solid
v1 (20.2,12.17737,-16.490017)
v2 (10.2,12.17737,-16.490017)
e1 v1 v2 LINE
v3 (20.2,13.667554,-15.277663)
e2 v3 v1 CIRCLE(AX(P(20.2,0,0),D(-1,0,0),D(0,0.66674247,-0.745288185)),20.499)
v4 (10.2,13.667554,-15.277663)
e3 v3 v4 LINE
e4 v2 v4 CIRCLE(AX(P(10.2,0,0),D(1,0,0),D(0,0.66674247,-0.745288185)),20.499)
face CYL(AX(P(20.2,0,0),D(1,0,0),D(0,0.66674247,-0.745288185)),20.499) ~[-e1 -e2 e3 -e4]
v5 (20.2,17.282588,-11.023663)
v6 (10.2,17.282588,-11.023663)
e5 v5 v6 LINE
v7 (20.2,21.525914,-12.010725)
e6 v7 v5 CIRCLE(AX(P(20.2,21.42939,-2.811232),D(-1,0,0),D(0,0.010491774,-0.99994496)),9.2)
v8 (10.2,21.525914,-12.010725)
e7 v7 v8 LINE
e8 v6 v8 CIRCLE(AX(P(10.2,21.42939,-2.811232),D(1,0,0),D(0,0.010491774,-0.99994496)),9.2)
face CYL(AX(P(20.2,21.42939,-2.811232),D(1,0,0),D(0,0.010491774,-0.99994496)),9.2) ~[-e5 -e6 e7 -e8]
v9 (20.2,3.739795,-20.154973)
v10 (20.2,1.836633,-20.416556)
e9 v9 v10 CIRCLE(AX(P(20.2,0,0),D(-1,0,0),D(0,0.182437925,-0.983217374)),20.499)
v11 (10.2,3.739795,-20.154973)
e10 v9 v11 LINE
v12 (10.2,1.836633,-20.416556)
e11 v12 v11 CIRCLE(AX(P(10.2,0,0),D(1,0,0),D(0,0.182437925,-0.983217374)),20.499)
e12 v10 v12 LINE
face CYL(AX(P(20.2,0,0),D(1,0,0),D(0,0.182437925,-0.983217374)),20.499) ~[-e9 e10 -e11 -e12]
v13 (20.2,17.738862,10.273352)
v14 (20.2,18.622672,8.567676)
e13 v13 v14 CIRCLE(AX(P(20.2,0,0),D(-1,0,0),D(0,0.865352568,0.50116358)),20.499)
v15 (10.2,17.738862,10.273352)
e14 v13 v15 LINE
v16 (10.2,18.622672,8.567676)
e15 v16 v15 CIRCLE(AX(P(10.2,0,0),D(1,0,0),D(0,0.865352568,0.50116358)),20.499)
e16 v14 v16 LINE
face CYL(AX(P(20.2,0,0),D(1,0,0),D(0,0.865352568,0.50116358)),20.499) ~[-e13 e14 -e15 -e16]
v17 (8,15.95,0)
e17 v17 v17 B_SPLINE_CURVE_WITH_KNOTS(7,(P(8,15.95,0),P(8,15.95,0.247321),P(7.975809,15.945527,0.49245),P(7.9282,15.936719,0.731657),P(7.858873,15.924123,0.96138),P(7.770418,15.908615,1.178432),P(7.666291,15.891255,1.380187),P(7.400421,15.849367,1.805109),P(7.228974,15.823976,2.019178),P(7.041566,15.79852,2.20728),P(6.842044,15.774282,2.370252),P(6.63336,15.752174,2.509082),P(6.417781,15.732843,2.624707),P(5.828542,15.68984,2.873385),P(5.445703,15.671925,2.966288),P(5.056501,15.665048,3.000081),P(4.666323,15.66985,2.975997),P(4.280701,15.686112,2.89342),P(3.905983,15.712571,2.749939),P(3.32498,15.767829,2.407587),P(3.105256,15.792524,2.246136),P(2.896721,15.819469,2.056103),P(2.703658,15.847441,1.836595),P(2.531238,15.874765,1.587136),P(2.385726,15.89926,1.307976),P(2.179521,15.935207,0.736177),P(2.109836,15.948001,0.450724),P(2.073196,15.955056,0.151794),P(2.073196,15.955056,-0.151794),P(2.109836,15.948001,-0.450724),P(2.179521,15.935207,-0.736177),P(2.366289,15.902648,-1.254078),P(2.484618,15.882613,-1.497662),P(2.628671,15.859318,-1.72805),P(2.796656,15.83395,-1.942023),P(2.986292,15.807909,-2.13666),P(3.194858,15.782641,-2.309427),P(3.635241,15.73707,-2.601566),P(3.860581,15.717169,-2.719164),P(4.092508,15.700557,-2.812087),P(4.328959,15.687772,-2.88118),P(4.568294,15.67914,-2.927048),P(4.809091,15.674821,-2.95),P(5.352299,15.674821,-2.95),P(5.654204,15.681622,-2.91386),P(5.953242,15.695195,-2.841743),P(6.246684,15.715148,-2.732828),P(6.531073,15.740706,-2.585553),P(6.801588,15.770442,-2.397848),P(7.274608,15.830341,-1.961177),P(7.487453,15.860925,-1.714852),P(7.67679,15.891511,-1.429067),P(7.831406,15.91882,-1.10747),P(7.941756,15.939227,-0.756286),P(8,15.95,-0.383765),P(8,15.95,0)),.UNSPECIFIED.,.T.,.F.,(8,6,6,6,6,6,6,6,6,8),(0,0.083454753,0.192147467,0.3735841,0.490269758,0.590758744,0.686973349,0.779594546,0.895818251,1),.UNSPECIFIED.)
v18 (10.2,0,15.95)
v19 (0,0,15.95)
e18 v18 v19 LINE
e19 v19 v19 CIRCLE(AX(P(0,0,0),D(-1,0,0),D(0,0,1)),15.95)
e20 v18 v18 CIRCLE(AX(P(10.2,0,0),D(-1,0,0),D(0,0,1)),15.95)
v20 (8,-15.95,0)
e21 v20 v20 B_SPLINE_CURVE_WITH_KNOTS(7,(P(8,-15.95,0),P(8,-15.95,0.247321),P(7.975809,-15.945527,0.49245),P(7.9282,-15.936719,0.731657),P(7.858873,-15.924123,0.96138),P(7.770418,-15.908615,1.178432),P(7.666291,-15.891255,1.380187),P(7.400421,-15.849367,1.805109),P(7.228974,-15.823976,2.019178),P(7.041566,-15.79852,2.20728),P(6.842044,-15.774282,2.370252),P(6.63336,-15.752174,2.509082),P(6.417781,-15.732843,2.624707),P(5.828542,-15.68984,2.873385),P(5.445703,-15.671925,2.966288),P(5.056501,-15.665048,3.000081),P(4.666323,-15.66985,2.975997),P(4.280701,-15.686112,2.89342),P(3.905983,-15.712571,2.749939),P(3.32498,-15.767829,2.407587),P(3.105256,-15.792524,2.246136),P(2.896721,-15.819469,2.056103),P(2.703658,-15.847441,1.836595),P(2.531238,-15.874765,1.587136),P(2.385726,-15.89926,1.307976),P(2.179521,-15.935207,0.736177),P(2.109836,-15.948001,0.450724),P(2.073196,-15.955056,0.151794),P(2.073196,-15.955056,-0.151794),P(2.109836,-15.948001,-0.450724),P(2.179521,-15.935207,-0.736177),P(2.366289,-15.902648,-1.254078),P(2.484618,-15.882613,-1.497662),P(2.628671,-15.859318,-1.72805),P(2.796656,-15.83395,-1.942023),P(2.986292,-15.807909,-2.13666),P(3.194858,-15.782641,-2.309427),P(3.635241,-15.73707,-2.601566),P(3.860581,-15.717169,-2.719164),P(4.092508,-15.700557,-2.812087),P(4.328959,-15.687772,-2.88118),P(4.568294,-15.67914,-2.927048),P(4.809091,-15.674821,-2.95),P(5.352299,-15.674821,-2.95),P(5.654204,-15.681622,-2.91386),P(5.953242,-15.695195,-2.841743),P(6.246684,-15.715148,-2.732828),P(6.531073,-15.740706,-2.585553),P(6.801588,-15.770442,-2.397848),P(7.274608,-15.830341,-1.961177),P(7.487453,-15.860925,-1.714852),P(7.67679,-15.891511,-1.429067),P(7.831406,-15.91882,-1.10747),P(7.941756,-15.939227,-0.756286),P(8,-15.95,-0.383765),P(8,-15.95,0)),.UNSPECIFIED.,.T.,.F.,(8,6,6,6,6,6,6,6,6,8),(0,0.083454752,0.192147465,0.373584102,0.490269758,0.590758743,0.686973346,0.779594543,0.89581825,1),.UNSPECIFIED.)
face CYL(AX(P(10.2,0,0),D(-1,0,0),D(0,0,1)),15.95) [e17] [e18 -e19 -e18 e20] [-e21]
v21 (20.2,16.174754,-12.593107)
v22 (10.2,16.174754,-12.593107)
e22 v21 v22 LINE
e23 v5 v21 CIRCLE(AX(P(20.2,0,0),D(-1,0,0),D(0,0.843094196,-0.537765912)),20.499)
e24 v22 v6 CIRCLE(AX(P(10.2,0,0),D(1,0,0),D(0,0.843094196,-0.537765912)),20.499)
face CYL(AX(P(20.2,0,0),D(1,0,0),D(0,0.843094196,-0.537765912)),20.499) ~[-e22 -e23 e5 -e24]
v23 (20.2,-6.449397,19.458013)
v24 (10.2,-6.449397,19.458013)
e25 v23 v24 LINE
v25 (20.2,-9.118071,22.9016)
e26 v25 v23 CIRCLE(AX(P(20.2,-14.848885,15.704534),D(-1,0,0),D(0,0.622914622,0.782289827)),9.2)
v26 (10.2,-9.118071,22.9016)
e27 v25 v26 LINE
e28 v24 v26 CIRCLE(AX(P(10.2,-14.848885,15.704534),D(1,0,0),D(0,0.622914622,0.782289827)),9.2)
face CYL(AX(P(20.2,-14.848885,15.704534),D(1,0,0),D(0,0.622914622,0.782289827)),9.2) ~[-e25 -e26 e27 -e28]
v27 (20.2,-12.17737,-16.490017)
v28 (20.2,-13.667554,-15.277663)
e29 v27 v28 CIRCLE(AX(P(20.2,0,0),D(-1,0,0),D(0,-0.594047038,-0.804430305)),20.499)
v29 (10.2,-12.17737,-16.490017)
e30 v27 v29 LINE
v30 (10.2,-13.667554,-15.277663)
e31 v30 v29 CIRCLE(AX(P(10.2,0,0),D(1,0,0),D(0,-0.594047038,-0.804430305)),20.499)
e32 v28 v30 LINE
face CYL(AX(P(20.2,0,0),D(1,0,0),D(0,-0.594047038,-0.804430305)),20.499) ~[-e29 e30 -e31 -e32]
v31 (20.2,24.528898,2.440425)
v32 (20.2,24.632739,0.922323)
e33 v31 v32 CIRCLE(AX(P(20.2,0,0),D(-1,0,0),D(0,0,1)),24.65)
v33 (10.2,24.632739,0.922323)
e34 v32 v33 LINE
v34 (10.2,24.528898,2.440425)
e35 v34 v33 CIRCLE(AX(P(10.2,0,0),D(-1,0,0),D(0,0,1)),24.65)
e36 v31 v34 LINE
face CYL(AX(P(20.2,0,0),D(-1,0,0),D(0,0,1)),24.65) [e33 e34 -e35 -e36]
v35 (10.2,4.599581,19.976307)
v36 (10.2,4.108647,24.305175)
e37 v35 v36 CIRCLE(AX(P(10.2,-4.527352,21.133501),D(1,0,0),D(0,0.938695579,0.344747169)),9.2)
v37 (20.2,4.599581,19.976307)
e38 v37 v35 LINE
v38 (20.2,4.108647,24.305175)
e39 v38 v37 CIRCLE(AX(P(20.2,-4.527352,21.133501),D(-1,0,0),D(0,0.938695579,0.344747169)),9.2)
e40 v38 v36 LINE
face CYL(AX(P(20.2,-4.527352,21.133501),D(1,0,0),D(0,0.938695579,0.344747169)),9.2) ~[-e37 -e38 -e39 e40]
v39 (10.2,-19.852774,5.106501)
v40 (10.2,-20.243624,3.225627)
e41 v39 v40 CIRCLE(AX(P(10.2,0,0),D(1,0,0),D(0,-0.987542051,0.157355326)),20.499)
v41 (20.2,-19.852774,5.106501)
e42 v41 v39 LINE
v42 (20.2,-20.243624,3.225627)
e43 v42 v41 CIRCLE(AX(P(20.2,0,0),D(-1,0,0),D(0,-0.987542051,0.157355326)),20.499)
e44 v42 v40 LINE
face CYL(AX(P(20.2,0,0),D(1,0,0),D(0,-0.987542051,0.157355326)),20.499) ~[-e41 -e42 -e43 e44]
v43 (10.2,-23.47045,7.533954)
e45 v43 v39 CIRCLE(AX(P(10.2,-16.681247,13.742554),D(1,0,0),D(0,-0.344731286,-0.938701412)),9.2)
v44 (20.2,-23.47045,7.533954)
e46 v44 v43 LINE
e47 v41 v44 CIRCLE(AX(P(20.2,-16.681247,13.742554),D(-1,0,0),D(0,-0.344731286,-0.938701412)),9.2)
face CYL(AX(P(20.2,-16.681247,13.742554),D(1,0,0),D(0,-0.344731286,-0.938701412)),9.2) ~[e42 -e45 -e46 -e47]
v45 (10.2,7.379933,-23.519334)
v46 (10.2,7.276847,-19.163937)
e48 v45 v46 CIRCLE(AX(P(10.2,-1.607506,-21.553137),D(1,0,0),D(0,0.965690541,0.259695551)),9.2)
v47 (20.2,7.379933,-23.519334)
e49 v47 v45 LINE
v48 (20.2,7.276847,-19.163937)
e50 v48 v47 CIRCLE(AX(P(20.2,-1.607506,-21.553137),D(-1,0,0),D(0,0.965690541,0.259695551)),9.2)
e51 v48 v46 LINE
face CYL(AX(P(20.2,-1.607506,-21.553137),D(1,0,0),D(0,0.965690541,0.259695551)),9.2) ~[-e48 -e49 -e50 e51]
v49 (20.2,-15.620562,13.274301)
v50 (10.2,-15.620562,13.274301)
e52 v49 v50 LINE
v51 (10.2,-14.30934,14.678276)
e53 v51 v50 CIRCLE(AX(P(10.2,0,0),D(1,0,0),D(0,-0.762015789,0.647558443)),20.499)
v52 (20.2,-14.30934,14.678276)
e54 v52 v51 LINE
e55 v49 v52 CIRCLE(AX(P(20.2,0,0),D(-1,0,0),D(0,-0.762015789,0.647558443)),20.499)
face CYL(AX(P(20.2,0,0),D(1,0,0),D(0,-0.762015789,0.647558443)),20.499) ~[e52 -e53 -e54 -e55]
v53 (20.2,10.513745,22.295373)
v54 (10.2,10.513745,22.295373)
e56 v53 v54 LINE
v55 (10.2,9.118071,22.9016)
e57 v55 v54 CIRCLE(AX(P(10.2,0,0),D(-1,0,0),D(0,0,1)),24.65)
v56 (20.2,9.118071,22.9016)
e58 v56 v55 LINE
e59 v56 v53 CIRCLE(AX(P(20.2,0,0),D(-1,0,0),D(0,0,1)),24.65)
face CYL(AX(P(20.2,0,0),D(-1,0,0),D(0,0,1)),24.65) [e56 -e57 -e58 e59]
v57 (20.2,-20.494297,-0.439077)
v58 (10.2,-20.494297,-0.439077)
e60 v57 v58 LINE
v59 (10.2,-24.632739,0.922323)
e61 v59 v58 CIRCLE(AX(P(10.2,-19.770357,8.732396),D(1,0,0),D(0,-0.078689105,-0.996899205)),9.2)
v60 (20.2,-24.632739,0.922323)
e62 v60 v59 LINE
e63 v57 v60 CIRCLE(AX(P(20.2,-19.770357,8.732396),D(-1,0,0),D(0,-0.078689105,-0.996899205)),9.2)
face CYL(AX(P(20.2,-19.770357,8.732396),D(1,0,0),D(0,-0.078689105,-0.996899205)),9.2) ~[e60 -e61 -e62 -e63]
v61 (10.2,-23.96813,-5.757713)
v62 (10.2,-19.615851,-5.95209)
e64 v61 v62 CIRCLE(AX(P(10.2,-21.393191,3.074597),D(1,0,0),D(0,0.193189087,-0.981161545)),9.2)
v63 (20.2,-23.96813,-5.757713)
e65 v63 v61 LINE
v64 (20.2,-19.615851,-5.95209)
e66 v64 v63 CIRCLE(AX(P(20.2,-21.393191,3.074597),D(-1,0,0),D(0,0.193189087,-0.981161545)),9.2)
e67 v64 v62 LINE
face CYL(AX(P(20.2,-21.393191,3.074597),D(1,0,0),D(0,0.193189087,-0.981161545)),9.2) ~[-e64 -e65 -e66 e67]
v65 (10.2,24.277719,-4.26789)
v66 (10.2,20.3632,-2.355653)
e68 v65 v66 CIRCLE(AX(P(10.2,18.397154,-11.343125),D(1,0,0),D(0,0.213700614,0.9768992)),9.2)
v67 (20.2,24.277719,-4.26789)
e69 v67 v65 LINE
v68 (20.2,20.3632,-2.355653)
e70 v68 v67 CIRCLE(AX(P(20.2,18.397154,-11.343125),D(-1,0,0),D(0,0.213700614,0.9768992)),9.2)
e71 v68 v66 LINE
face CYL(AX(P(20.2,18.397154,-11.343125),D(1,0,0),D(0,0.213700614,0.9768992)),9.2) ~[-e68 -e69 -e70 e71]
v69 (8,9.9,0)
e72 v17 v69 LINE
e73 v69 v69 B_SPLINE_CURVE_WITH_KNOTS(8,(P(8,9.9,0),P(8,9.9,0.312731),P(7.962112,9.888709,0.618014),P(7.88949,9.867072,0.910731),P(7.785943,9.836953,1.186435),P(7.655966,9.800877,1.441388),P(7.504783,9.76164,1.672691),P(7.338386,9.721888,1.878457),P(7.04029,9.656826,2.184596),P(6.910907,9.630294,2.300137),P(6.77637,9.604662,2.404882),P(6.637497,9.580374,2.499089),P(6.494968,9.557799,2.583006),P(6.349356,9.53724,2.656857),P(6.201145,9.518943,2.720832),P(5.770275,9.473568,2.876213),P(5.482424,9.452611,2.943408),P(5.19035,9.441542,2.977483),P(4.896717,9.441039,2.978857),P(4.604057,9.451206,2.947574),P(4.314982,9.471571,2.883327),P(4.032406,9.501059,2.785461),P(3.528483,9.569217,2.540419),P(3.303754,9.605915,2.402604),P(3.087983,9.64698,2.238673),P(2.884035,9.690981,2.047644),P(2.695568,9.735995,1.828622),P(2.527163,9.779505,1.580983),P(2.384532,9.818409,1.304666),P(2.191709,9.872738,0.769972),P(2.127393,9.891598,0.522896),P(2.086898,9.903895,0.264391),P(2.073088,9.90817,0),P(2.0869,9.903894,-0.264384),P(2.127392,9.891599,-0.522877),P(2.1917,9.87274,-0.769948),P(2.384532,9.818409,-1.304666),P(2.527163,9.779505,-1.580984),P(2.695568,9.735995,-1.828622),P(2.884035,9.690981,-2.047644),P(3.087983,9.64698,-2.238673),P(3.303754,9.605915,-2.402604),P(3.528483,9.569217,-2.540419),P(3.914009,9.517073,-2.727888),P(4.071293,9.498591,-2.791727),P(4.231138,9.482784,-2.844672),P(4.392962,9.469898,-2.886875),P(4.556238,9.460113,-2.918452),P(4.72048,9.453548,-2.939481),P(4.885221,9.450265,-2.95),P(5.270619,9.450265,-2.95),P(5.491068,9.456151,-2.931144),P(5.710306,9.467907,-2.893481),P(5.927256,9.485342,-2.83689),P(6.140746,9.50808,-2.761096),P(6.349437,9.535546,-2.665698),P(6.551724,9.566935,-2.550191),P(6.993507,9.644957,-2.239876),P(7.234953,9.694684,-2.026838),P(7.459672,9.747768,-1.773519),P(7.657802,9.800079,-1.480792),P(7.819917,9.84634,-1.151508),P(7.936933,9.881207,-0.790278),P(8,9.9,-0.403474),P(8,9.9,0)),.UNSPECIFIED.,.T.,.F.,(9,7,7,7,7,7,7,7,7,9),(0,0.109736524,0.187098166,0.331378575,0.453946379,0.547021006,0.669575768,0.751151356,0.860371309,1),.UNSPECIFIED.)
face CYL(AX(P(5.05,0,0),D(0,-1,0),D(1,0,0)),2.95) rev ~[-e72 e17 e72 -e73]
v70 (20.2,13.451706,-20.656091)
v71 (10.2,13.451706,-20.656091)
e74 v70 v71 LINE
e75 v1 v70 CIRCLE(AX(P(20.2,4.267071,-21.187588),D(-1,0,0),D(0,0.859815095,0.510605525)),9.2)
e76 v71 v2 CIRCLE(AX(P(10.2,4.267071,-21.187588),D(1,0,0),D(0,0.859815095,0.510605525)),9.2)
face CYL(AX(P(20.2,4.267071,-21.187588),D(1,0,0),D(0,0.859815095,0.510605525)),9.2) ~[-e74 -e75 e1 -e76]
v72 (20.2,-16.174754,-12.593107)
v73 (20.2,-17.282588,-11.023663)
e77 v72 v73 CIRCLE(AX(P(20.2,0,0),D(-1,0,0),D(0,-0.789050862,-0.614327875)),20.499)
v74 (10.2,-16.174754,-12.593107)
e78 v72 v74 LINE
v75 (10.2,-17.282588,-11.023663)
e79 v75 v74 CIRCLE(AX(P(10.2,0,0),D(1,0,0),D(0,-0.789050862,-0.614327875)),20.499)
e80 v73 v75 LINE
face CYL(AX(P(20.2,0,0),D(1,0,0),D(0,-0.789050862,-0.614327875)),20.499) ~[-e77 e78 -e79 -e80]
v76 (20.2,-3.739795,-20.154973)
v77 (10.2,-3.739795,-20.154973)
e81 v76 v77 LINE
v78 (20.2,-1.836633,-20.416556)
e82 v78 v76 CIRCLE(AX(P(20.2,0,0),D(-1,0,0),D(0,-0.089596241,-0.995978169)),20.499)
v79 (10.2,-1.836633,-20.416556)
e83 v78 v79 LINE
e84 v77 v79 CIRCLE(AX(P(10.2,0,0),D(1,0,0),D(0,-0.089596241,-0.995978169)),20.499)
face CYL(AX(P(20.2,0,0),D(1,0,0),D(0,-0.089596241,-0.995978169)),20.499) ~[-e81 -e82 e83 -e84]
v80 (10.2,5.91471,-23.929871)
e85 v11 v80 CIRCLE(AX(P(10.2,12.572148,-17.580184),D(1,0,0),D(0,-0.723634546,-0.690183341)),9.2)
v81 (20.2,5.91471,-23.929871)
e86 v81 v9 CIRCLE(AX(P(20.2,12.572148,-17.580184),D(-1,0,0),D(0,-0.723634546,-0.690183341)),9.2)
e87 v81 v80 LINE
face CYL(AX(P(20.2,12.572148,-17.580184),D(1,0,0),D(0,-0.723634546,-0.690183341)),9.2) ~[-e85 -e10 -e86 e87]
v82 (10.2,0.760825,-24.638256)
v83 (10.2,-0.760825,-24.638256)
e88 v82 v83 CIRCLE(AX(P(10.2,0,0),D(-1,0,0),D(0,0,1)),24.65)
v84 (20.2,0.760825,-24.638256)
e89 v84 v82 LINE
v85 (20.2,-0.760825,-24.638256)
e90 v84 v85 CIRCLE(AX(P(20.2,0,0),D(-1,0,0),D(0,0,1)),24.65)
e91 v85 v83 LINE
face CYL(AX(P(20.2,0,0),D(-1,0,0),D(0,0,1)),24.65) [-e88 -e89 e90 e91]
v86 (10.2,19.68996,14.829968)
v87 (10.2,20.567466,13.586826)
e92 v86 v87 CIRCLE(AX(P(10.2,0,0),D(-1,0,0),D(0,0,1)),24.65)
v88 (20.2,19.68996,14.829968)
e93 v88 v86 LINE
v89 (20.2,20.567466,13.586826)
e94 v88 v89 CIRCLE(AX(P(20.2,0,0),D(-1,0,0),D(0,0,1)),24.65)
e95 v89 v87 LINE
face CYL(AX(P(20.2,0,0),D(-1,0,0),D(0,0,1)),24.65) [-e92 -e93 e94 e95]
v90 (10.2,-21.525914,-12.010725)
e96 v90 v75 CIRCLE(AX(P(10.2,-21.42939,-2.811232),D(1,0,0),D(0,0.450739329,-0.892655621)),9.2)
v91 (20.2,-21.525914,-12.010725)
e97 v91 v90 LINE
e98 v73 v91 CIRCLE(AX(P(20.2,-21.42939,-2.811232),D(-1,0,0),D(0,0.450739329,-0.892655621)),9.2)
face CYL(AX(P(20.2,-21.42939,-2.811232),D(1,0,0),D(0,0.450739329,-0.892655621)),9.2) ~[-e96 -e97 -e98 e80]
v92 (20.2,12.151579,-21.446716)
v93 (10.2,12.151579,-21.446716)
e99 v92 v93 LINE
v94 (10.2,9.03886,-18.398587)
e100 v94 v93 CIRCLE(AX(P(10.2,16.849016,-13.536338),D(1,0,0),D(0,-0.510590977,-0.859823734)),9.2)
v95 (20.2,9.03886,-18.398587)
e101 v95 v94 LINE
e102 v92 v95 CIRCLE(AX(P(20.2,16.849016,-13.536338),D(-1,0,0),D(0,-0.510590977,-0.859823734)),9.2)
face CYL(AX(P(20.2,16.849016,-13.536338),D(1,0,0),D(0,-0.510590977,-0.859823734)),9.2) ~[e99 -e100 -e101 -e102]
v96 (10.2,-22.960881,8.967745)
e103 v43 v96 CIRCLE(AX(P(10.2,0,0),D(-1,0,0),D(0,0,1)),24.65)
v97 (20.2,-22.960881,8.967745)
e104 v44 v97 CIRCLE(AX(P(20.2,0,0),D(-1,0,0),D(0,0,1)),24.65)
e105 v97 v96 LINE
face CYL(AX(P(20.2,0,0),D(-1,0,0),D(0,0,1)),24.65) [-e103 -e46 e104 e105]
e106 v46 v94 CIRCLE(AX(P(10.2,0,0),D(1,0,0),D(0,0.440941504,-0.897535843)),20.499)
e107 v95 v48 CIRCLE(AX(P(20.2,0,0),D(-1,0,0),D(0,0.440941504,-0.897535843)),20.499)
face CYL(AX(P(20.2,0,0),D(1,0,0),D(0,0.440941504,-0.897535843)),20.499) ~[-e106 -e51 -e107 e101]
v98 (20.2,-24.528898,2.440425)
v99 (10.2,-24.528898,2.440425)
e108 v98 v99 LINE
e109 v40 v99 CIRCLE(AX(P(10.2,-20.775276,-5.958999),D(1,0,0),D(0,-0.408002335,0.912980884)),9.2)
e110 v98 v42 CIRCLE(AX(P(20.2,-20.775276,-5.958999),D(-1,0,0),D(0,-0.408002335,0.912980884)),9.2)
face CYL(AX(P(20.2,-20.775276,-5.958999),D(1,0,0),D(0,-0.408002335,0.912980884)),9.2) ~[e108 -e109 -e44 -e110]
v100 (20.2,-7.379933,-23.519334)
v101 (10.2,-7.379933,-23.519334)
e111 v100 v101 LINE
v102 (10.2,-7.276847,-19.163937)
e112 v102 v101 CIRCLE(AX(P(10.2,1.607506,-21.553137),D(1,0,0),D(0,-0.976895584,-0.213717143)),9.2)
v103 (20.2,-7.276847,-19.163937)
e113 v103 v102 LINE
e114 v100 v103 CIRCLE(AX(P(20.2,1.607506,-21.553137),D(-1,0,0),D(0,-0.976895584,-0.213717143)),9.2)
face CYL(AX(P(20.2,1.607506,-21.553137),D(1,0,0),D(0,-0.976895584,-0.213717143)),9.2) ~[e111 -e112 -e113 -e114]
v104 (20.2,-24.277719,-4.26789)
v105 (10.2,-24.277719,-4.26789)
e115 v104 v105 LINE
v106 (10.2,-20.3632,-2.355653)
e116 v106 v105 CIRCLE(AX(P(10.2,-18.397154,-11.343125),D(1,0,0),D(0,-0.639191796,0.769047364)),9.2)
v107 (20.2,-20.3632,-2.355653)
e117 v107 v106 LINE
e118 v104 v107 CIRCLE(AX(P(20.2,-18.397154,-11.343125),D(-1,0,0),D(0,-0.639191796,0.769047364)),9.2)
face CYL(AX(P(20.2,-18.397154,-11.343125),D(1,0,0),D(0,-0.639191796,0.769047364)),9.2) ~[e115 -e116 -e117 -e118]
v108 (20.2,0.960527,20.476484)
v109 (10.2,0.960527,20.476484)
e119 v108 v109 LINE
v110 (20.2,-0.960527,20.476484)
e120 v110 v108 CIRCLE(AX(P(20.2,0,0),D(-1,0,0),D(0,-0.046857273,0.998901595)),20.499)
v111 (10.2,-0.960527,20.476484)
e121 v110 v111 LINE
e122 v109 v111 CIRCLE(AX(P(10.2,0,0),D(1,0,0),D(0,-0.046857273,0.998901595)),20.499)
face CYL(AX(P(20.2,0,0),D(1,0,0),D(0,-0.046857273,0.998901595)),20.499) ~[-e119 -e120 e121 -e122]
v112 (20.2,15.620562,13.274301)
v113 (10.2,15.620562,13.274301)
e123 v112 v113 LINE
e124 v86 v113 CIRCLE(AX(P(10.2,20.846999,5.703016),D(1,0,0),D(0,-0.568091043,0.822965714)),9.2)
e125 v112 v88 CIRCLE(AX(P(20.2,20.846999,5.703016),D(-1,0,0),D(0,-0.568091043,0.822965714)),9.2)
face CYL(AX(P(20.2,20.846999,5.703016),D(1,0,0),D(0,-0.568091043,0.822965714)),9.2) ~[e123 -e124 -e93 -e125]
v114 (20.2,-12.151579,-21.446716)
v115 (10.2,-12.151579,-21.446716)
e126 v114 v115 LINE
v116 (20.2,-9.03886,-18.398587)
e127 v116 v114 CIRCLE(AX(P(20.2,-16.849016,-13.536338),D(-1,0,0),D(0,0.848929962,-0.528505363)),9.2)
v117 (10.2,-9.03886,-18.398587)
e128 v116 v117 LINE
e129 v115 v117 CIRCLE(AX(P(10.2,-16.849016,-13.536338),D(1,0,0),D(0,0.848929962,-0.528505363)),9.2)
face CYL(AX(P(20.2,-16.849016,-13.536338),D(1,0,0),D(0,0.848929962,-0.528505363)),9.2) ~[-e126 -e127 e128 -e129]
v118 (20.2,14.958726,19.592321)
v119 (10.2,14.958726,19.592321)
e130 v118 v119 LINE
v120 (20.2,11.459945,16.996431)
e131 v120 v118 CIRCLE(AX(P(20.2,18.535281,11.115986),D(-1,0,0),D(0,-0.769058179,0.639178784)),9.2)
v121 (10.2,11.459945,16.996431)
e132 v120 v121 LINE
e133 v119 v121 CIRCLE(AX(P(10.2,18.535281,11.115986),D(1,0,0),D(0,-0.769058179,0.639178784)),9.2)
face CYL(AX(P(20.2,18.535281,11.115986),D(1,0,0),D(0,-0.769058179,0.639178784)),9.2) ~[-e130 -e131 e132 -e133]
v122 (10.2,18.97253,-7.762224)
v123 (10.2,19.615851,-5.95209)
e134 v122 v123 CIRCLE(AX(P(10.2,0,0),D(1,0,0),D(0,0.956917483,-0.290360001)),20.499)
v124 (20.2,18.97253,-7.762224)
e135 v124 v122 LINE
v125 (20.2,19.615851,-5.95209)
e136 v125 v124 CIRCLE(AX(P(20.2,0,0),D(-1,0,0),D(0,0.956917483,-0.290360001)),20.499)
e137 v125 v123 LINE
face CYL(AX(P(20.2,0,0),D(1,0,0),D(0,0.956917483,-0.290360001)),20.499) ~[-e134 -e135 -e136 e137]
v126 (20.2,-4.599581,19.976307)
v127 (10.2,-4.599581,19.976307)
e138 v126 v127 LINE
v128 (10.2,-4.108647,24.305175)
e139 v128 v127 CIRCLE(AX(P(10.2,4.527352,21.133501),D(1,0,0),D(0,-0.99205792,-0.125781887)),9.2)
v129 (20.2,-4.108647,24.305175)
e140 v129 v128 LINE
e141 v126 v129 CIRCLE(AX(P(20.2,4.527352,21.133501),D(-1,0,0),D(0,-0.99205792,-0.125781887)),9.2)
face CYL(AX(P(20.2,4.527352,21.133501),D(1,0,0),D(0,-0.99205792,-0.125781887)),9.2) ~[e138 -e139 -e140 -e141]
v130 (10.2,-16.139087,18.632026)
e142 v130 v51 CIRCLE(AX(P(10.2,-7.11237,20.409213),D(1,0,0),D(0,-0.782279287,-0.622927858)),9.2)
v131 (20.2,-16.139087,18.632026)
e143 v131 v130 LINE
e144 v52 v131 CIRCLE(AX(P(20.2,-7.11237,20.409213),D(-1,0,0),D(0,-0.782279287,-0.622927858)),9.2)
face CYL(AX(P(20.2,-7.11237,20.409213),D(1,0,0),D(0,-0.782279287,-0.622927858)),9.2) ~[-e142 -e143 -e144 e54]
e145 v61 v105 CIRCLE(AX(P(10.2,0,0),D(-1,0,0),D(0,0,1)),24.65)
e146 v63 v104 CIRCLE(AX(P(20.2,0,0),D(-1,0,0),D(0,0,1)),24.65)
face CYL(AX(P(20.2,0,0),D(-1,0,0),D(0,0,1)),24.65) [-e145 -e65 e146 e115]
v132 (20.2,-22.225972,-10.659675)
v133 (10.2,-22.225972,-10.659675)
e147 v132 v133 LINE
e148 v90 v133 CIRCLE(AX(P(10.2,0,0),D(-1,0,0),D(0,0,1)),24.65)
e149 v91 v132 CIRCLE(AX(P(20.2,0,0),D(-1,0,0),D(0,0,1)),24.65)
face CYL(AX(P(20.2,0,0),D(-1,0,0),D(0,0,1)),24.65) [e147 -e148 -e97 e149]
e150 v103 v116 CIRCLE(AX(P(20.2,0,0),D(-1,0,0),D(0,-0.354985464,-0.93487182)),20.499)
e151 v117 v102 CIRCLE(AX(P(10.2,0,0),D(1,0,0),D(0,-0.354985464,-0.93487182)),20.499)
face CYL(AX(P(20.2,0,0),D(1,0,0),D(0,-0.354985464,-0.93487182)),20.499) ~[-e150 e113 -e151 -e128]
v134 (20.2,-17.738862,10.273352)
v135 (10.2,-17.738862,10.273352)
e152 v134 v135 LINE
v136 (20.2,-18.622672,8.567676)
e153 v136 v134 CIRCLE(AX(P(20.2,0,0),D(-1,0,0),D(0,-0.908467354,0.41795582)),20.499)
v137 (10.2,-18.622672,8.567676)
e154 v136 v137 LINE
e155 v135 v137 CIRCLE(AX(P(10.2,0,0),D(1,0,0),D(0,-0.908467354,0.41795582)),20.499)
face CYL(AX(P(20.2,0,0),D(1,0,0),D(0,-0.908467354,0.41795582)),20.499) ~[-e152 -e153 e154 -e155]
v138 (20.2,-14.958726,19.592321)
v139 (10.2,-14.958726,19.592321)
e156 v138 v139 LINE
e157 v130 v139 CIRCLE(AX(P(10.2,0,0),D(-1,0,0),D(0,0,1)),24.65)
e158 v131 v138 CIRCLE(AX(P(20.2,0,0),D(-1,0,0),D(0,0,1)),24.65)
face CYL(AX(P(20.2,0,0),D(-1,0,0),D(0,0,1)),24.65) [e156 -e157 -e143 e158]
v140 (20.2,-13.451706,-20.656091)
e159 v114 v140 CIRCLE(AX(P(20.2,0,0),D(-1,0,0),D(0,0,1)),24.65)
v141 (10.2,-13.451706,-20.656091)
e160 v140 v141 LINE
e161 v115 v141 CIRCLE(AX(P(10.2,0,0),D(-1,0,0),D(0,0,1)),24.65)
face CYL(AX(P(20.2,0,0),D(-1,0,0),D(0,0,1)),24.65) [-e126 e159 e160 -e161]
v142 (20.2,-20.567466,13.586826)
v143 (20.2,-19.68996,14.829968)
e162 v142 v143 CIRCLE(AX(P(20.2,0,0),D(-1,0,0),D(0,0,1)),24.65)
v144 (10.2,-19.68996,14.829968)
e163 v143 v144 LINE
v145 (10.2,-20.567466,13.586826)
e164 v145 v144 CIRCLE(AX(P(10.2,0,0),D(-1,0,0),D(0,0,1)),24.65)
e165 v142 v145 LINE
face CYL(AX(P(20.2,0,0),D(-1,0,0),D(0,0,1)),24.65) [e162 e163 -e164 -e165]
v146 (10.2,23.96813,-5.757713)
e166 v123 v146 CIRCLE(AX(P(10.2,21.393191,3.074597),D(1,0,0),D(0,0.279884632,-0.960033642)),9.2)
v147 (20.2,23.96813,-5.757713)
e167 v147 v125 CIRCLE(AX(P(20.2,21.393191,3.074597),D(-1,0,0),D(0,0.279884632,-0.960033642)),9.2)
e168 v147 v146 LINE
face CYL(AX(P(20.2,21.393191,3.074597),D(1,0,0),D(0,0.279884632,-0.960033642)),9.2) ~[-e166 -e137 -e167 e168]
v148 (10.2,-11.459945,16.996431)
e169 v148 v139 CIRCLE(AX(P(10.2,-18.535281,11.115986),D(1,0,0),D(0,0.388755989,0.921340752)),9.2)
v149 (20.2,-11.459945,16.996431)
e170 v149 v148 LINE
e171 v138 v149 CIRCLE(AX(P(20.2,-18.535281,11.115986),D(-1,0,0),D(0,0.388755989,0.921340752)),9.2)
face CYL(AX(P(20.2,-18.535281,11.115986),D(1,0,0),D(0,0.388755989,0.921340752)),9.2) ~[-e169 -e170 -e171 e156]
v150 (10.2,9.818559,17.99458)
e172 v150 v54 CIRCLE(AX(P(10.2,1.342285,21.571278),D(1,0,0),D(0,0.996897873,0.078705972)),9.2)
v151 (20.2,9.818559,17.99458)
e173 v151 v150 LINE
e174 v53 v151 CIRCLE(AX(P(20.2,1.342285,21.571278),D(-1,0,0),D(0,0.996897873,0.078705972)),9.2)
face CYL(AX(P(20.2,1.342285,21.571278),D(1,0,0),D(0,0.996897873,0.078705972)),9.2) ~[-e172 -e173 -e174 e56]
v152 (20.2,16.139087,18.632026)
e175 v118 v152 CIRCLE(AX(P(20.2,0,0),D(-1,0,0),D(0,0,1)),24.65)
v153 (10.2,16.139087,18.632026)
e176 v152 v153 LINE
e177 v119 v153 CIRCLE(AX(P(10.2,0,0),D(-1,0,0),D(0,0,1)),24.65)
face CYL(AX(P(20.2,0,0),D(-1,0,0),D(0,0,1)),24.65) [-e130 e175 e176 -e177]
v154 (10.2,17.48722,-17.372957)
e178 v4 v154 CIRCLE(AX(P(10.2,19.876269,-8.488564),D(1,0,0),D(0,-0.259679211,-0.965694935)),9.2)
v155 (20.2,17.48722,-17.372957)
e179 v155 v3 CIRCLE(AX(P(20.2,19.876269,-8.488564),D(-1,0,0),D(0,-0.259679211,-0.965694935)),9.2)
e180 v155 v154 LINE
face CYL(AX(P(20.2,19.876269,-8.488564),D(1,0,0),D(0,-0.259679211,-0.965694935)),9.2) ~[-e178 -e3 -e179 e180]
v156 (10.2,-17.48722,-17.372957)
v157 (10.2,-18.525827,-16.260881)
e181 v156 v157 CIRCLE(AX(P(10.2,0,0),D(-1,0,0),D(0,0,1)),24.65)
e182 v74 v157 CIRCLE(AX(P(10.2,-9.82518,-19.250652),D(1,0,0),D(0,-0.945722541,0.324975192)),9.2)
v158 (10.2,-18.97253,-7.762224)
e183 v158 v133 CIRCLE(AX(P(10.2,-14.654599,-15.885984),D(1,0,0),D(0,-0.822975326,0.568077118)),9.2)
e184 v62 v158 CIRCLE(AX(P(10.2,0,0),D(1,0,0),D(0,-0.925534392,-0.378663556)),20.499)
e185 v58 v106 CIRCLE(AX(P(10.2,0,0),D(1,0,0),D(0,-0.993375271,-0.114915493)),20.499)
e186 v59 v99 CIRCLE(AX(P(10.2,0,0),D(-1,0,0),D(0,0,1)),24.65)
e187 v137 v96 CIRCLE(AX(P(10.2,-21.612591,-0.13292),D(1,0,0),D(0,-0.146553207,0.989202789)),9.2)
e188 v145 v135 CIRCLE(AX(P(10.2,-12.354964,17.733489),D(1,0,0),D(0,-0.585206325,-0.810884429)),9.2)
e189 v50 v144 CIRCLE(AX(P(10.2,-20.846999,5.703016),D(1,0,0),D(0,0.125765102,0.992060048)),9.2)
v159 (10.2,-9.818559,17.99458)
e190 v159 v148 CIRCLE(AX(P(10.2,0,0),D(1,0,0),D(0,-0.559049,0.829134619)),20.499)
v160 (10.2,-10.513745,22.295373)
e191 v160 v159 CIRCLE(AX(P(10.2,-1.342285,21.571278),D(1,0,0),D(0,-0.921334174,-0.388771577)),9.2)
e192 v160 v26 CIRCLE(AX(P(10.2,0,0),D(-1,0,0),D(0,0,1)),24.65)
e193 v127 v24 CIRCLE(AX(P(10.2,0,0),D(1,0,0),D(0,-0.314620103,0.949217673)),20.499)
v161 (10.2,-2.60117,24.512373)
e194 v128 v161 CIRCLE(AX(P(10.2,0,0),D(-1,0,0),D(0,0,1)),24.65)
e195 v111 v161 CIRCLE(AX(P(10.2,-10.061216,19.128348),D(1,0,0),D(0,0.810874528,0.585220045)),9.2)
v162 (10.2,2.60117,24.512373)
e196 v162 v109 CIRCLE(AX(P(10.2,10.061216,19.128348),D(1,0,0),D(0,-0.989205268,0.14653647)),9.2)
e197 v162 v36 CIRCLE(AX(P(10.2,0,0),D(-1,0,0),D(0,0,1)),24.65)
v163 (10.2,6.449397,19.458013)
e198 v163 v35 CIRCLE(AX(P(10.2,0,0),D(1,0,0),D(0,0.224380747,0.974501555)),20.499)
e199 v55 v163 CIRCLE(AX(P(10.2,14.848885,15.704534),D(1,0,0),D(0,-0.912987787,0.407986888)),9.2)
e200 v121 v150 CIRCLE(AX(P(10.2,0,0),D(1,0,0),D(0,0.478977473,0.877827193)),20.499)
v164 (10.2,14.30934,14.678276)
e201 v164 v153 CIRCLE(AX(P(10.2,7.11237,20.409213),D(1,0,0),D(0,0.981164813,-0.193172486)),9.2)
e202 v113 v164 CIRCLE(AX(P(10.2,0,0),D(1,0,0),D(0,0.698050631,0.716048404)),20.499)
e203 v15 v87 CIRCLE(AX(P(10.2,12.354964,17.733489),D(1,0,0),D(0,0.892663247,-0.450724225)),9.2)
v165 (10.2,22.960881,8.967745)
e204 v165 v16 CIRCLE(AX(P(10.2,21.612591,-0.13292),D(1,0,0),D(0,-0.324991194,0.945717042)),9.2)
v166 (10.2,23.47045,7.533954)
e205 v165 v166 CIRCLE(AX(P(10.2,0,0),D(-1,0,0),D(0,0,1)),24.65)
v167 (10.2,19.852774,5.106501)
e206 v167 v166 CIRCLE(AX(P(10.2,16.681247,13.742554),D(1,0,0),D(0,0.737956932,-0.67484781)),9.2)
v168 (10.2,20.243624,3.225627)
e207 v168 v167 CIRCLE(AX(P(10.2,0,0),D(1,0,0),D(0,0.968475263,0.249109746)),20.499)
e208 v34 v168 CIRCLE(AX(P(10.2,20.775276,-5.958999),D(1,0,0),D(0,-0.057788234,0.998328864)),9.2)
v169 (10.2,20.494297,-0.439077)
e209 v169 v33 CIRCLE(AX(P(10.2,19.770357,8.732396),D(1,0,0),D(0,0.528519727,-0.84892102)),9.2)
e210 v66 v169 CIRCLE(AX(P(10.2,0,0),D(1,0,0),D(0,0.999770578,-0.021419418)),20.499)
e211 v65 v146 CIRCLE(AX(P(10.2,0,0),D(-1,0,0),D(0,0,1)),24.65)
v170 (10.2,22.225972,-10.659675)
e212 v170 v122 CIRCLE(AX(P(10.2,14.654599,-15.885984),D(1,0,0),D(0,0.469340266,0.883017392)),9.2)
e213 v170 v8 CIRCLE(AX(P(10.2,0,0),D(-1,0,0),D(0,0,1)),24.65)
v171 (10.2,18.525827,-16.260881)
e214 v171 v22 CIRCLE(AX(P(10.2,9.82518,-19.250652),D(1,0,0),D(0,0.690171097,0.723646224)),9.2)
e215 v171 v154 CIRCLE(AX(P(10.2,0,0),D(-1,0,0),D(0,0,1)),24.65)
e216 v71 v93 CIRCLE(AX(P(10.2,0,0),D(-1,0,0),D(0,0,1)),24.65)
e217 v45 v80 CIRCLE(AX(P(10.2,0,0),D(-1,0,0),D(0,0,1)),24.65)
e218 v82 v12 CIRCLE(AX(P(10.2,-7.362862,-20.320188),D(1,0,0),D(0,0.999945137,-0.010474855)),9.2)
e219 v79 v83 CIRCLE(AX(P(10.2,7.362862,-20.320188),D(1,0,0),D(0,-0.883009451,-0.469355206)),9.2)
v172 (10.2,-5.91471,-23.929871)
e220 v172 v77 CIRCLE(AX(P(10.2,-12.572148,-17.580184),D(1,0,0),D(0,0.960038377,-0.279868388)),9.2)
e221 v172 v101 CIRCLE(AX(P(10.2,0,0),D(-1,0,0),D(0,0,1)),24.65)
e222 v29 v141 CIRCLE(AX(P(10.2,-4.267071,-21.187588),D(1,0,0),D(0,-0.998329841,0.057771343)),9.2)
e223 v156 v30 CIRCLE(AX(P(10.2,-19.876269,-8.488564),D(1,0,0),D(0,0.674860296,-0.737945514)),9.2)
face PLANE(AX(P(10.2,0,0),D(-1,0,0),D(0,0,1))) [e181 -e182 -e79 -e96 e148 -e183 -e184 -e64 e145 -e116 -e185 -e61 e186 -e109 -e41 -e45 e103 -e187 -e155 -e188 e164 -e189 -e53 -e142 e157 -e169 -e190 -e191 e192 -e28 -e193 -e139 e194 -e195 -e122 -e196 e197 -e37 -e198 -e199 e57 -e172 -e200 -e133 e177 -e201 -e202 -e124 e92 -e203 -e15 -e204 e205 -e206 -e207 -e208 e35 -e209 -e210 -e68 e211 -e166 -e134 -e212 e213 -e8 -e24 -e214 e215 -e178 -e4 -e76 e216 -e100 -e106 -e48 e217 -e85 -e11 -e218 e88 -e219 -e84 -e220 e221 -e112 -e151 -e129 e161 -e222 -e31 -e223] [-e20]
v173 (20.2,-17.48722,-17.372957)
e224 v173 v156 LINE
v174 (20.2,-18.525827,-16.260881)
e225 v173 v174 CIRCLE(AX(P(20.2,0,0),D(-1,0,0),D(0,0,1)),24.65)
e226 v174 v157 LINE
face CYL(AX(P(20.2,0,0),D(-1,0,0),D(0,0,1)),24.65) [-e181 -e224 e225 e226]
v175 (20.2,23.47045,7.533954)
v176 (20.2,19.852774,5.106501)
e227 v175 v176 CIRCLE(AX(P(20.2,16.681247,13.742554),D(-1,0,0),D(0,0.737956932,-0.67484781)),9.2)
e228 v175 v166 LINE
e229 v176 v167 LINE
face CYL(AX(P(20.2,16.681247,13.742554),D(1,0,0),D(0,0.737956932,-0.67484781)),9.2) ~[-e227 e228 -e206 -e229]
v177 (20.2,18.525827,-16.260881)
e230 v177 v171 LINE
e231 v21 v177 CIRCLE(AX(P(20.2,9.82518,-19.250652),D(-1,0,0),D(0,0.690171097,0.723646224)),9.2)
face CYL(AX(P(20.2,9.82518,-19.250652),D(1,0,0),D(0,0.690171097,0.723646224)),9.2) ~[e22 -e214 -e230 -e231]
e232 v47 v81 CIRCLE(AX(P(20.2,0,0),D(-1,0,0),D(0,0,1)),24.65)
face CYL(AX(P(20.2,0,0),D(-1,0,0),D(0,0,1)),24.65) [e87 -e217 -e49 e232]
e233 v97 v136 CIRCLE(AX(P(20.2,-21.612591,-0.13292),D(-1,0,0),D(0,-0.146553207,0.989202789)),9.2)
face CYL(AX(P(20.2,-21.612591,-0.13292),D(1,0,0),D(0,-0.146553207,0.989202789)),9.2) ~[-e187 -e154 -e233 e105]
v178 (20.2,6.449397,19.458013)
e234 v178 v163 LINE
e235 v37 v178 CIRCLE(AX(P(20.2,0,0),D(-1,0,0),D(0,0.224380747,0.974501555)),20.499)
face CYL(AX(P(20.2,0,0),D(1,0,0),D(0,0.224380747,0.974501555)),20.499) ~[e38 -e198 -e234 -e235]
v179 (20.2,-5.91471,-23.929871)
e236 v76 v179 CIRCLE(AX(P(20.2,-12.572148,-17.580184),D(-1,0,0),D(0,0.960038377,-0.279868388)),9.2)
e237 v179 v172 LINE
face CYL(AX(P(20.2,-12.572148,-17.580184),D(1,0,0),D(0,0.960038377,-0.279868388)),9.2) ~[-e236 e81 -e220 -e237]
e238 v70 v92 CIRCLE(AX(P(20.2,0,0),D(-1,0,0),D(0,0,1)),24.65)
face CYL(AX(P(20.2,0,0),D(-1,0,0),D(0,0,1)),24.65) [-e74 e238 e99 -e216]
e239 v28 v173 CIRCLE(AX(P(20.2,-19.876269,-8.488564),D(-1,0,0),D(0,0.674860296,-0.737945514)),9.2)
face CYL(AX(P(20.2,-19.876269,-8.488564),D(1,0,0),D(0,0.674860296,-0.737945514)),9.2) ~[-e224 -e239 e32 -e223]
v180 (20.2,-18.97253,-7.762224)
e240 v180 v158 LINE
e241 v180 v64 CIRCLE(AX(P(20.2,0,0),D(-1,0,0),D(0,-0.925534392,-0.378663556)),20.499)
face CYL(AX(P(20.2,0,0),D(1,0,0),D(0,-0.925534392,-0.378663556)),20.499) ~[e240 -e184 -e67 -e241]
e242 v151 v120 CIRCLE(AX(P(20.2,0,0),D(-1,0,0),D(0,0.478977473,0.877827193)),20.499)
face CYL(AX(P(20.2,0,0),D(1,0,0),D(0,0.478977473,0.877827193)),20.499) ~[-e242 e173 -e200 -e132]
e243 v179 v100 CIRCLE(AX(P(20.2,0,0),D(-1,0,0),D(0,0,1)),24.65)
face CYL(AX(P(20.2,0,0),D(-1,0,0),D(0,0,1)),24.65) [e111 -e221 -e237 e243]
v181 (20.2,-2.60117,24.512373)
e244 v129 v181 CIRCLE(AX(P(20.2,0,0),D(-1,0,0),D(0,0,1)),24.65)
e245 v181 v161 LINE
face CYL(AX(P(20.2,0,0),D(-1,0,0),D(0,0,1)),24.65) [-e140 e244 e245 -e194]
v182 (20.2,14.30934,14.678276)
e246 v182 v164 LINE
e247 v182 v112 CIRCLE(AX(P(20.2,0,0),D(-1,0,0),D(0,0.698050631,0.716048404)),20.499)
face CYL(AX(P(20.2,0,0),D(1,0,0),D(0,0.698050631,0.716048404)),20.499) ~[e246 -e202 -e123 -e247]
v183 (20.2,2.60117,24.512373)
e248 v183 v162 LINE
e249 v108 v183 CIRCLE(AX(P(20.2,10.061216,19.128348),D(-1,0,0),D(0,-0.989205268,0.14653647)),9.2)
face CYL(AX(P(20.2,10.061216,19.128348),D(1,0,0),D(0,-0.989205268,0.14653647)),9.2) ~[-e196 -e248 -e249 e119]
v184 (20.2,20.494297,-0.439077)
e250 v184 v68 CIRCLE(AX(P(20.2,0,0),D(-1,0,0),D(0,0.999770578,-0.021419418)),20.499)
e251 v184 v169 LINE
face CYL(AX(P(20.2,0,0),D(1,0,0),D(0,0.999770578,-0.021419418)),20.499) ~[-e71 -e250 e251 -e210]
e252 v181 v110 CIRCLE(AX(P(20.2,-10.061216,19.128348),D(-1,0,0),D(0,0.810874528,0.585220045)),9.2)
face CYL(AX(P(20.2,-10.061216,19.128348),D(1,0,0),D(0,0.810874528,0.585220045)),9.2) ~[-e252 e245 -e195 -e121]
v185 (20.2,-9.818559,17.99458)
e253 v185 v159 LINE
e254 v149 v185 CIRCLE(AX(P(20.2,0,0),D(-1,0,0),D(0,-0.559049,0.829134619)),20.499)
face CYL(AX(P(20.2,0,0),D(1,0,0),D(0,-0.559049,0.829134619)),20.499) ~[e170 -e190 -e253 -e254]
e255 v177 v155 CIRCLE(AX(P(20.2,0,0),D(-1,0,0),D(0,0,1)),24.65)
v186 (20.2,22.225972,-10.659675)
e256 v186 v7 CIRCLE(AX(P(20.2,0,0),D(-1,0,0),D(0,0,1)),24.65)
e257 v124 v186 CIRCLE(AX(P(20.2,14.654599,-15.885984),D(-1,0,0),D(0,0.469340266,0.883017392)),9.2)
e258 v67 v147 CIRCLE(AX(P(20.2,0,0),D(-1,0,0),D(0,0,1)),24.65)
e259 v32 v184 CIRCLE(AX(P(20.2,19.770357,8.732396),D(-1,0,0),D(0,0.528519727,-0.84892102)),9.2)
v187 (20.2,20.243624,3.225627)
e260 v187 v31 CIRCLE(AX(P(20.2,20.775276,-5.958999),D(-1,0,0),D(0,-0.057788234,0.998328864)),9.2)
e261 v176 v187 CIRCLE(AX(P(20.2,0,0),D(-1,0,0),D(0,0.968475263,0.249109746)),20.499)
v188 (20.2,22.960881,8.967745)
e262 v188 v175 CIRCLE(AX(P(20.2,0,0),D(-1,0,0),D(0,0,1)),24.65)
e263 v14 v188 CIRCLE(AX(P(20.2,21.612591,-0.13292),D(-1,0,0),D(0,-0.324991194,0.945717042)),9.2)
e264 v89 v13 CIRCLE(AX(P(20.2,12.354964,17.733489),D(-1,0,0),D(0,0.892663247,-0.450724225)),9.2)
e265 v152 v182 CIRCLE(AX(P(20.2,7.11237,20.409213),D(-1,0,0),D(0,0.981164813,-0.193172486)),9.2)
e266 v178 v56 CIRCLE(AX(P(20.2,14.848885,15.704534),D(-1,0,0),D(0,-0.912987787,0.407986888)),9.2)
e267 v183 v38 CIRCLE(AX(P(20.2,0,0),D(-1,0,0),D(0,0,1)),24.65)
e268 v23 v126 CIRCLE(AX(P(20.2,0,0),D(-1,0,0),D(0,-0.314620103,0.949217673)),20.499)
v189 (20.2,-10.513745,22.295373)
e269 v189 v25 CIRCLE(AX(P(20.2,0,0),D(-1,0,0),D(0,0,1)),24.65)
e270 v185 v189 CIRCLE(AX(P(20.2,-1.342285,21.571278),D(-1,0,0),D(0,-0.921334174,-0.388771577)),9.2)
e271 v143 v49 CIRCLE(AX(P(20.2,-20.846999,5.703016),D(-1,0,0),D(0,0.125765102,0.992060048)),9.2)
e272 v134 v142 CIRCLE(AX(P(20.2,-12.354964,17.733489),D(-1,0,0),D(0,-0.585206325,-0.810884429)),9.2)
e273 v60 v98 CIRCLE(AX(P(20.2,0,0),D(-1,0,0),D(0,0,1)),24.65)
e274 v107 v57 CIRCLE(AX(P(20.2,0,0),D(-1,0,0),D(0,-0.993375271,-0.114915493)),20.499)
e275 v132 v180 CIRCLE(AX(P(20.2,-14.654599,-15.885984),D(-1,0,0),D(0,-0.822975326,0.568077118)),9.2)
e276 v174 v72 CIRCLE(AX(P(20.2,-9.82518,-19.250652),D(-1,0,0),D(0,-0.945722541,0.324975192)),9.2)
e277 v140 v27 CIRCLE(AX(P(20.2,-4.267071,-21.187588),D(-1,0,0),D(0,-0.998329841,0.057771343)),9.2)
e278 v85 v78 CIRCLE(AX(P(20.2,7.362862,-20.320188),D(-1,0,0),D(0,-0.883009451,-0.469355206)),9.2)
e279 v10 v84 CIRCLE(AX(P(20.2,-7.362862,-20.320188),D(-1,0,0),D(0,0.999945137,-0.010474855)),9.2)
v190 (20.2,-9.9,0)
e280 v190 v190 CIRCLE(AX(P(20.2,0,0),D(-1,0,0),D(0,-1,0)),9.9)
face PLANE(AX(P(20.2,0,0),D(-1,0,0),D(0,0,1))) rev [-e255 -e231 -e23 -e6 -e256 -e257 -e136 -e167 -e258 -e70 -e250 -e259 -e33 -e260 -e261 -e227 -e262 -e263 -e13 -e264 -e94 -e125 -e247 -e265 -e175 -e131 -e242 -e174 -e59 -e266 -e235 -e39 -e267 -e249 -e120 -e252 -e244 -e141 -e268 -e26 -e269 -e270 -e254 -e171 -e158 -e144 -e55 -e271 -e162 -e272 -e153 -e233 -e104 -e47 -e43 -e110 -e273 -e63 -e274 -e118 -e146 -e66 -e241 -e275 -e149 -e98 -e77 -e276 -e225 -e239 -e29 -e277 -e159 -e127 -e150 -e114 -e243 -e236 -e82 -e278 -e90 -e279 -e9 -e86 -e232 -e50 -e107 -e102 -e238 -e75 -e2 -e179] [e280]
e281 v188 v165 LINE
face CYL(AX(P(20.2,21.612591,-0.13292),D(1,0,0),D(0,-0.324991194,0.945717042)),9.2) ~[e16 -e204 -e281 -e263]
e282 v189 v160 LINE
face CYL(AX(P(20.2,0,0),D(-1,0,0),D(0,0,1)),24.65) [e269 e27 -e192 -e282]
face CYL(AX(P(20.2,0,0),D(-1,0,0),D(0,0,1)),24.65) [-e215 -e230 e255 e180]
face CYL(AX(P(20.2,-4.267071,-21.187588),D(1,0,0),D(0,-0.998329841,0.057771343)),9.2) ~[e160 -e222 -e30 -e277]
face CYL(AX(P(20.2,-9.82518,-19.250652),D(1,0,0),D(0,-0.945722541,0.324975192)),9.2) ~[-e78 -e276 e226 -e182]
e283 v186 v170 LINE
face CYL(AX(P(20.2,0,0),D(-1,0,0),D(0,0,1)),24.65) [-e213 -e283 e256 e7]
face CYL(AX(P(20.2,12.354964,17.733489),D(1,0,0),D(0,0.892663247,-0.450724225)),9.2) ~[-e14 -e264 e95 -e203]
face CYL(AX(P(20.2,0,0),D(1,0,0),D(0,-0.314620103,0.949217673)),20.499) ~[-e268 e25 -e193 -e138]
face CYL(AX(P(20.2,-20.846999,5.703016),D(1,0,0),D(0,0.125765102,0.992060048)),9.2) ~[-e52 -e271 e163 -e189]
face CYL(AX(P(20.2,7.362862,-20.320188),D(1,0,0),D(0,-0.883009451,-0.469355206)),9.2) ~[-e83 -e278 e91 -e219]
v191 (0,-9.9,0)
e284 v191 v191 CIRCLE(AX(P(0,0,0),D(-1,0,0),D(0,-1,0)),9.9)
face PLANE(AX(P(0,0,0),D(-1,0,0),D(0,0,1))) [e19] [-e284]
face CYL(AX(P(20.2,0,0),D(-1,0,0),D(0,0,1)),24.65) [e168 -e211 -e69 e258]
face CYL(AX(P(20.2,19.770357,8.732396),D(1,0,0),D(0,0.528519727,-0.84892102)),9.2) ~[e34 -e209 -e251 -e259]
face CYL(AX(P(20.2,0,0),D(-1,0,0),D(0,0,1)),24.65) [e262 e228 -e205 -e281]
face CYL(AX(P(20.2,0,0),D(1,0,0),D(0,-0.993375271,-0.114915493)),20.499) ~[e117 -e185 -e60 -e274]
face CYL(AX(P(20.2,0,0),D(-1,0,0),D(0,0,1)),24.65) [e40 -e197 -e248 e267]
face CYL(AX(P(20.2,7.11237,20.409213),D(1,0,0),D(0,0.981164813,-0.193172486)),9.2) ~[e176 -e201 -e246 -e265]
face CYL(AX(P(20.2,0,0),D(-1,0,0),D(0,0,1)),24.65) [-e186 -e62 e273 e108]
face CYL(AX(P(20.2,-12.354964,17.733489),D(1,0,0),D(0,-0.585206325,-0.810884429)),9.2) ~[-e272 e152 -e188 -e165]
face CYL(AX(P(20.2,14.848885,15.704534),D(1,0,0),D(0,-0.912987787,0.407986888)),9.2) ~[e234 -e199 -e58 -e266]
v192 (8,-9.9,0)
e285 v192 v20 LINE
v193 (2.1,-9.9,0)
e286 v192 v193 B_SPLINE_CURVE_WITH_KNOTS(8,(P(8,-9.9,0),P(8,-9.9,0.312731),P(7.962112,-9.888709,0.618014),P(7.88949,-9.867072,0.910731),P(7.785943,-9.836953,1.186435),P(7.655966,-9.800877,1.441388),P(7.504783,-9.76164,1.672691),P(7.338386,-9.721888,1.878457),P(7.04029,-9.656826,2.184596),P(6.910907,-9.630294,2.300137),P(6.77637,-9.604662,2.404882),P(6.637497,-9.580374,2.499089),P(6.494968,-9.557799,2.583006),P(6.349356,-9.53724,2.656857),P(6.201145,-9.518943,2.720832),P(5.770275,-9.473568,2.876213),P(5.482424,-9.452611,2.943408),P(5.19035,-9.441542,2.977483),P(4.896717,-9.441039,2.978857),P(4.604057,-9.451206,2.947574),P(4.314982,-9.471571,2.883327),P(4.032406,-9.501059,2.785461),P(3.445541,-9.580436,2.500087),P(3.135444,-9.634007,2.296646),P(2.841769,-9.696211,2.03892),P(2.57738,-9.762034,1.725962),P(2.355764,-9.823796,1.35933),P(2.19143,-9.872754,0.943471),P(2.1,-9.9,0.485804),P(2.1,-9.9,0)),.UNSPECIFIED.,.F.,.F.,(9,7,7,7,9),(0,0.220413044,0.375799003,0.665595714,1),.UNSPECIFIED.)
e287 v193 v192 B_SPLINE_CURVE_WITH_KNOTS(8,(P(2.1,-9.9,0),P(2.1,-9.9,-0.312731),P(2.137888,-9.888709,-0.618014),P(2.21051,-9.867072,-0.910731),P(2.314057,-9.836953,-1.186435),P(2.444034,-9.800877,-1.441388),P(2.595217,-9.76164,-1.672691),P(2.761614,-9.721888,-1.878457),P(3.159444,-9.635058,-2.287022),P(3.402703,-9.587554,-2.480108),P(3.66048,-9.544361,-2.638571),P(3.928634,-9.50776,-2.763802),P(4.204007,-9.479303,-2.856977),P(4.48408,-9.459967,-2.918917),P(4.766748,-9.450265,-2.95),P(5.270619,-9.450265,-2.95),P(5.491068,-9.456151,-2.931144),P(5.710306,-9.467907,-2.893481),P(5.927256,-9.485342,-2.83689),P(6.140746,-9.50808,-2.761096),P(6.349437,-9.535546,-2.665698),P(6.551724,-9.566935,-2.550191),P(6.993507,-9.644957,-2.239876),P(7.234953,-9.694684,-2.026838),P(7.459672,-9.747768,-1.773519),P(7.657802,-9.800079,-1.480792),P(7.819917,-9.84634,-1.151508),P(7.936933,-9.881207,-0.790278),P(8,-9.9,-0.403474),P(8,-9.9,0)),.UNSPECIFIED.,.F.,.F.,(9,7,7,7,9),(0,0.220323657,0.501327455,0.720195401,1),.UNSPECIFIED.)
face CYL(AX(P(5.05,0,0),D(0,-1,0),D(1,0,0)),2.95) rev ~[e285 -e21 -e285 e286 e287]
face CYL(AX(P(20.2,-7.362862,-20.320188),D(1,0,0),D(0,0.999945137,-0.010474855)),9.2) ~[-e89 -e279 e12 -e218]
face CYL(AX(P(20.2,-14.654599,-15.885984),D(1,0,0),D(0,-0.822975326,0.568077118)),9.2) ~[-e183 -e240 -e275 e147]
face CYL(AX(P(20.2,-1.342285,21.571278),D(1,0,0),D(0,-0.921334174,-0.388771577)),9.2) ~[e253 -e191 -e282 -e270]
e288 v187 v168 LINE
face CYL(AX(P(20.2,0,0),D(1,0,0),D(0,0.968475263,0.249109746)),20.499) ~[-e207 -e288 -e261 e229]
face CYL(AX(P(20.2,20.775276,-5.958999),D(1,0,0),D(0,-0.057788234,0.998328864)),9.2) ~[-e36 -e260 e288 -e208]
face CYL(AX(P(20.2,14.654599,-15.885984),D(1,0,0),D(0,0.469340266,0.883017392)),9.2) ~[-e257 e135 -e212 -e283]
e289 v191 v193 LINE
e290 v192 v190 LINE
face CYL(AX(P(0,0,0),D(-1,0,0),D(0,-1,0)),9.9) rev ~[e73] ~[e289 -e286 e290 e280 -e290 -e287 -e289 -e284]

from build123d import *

# Parameters (mm, degrees)
F2_R            = 9.9
F3_DEPTH        = 25
F5_DEPTH        = 25
F5_COPIES_COUNT = 23
F7_R            = 2.95
F8_DEPTH        = 24.9


# Not quite as in the source:
# - a feature of the source that left no trace in its solid (it failed there, or was rolled back) is left out
# - a pattern or mirror of a feature is missing from the dataset's text; its kind, count and spacing are read off the source's solid


with BuildPart() as f1:
    # F0 (on Front) → F1 (revolve)
    with BuildSketch(Plane.XZ):
        Polygon((0, 15.95), (0, 0), (20.2, 0), (20.2, 24.65), (10.2, 24.65), (10.2, 15.95), align=None)
    revolve(axis=Axis((10.1, 0, 0), (-1, 0, 0)))

    # F2 (on face) → F3 (cut)
    with BuildSketch(Plane(origin=(0, 0, 0), x_dir=(0, -1, 0), z_dir=(-1, 0, 0))):
        Circle(F2_R)
    extrude(amount=-F3_DEPTH, mode=Mode.SUBTRACT)

    # F4 (on face) → F5 (cut)
    with BuildSketch(Plane.YZ.offset(20.2)):
        with BuildLine():
            ThreePointArc((0.9605272399, 20.4764837905), (1.5385061373, 22.5929437067), (2.6011700561, 24.5123726787))
            ThreePointArc((2.6011700561, 24.5123726787), (0, 24.65), (-2.6011700561, 24.5123726787))
            ThreePointArc((-2.6011700561, 24.5123726787), (-1.5385061373, 22.5929437067), (-0.9605272399, 20.4764837905))
            ThreePointArc((-0.9605272399, 20.4764837905), (0, 20.499), (0.9605272399, 20.4764837905))
        make_face()
        with BuildLine():
            ThreePointArc((2.6011700561, 24.5123726787), (2.7312798677, 24.6882080288), (2.8655332609, 24.8609004137))
            ThreePointArc((2.8655332609, 24.8609004137), (0, 25.0255), (-2.8655332609, 24.8609004137))
            ThreePointArc((-2.8655332609, 24.8609004137), (-2.7312798677, 24.6882080288), (-2.6011700561, 24.5123726787))
            ThreePointArc((-2.6011700561, 24.5123726787), (0, 24.65), (2.6011700561, 24.5123726787))
        make_face()
    f5 = extrude(amount=-F5_DEPTH, mode=Mode.SUBTRACT)

    # F5_copies: F5 ×23 about axis
    f5_copies_axis = Axis((0, 0, 0), (1, 0, 0))
    for i in range(1, F5_COPIES_COUNT):
        add(f5.rotate(f5_copies_axis, i * 360 / F5_COPIES_COUNT), mode=Mode.SUBTRACT)

    # F7 (on Front) → F8 (cut, symmetric)
    with BuildSketch(Plane.XZ):
        with Locations((5.05, 0)):
            Circle(F7_R)
    extrude(amount=F8_DEPTH, both=True, mode=Mode.SUBTRACT)


solid = f1.part
